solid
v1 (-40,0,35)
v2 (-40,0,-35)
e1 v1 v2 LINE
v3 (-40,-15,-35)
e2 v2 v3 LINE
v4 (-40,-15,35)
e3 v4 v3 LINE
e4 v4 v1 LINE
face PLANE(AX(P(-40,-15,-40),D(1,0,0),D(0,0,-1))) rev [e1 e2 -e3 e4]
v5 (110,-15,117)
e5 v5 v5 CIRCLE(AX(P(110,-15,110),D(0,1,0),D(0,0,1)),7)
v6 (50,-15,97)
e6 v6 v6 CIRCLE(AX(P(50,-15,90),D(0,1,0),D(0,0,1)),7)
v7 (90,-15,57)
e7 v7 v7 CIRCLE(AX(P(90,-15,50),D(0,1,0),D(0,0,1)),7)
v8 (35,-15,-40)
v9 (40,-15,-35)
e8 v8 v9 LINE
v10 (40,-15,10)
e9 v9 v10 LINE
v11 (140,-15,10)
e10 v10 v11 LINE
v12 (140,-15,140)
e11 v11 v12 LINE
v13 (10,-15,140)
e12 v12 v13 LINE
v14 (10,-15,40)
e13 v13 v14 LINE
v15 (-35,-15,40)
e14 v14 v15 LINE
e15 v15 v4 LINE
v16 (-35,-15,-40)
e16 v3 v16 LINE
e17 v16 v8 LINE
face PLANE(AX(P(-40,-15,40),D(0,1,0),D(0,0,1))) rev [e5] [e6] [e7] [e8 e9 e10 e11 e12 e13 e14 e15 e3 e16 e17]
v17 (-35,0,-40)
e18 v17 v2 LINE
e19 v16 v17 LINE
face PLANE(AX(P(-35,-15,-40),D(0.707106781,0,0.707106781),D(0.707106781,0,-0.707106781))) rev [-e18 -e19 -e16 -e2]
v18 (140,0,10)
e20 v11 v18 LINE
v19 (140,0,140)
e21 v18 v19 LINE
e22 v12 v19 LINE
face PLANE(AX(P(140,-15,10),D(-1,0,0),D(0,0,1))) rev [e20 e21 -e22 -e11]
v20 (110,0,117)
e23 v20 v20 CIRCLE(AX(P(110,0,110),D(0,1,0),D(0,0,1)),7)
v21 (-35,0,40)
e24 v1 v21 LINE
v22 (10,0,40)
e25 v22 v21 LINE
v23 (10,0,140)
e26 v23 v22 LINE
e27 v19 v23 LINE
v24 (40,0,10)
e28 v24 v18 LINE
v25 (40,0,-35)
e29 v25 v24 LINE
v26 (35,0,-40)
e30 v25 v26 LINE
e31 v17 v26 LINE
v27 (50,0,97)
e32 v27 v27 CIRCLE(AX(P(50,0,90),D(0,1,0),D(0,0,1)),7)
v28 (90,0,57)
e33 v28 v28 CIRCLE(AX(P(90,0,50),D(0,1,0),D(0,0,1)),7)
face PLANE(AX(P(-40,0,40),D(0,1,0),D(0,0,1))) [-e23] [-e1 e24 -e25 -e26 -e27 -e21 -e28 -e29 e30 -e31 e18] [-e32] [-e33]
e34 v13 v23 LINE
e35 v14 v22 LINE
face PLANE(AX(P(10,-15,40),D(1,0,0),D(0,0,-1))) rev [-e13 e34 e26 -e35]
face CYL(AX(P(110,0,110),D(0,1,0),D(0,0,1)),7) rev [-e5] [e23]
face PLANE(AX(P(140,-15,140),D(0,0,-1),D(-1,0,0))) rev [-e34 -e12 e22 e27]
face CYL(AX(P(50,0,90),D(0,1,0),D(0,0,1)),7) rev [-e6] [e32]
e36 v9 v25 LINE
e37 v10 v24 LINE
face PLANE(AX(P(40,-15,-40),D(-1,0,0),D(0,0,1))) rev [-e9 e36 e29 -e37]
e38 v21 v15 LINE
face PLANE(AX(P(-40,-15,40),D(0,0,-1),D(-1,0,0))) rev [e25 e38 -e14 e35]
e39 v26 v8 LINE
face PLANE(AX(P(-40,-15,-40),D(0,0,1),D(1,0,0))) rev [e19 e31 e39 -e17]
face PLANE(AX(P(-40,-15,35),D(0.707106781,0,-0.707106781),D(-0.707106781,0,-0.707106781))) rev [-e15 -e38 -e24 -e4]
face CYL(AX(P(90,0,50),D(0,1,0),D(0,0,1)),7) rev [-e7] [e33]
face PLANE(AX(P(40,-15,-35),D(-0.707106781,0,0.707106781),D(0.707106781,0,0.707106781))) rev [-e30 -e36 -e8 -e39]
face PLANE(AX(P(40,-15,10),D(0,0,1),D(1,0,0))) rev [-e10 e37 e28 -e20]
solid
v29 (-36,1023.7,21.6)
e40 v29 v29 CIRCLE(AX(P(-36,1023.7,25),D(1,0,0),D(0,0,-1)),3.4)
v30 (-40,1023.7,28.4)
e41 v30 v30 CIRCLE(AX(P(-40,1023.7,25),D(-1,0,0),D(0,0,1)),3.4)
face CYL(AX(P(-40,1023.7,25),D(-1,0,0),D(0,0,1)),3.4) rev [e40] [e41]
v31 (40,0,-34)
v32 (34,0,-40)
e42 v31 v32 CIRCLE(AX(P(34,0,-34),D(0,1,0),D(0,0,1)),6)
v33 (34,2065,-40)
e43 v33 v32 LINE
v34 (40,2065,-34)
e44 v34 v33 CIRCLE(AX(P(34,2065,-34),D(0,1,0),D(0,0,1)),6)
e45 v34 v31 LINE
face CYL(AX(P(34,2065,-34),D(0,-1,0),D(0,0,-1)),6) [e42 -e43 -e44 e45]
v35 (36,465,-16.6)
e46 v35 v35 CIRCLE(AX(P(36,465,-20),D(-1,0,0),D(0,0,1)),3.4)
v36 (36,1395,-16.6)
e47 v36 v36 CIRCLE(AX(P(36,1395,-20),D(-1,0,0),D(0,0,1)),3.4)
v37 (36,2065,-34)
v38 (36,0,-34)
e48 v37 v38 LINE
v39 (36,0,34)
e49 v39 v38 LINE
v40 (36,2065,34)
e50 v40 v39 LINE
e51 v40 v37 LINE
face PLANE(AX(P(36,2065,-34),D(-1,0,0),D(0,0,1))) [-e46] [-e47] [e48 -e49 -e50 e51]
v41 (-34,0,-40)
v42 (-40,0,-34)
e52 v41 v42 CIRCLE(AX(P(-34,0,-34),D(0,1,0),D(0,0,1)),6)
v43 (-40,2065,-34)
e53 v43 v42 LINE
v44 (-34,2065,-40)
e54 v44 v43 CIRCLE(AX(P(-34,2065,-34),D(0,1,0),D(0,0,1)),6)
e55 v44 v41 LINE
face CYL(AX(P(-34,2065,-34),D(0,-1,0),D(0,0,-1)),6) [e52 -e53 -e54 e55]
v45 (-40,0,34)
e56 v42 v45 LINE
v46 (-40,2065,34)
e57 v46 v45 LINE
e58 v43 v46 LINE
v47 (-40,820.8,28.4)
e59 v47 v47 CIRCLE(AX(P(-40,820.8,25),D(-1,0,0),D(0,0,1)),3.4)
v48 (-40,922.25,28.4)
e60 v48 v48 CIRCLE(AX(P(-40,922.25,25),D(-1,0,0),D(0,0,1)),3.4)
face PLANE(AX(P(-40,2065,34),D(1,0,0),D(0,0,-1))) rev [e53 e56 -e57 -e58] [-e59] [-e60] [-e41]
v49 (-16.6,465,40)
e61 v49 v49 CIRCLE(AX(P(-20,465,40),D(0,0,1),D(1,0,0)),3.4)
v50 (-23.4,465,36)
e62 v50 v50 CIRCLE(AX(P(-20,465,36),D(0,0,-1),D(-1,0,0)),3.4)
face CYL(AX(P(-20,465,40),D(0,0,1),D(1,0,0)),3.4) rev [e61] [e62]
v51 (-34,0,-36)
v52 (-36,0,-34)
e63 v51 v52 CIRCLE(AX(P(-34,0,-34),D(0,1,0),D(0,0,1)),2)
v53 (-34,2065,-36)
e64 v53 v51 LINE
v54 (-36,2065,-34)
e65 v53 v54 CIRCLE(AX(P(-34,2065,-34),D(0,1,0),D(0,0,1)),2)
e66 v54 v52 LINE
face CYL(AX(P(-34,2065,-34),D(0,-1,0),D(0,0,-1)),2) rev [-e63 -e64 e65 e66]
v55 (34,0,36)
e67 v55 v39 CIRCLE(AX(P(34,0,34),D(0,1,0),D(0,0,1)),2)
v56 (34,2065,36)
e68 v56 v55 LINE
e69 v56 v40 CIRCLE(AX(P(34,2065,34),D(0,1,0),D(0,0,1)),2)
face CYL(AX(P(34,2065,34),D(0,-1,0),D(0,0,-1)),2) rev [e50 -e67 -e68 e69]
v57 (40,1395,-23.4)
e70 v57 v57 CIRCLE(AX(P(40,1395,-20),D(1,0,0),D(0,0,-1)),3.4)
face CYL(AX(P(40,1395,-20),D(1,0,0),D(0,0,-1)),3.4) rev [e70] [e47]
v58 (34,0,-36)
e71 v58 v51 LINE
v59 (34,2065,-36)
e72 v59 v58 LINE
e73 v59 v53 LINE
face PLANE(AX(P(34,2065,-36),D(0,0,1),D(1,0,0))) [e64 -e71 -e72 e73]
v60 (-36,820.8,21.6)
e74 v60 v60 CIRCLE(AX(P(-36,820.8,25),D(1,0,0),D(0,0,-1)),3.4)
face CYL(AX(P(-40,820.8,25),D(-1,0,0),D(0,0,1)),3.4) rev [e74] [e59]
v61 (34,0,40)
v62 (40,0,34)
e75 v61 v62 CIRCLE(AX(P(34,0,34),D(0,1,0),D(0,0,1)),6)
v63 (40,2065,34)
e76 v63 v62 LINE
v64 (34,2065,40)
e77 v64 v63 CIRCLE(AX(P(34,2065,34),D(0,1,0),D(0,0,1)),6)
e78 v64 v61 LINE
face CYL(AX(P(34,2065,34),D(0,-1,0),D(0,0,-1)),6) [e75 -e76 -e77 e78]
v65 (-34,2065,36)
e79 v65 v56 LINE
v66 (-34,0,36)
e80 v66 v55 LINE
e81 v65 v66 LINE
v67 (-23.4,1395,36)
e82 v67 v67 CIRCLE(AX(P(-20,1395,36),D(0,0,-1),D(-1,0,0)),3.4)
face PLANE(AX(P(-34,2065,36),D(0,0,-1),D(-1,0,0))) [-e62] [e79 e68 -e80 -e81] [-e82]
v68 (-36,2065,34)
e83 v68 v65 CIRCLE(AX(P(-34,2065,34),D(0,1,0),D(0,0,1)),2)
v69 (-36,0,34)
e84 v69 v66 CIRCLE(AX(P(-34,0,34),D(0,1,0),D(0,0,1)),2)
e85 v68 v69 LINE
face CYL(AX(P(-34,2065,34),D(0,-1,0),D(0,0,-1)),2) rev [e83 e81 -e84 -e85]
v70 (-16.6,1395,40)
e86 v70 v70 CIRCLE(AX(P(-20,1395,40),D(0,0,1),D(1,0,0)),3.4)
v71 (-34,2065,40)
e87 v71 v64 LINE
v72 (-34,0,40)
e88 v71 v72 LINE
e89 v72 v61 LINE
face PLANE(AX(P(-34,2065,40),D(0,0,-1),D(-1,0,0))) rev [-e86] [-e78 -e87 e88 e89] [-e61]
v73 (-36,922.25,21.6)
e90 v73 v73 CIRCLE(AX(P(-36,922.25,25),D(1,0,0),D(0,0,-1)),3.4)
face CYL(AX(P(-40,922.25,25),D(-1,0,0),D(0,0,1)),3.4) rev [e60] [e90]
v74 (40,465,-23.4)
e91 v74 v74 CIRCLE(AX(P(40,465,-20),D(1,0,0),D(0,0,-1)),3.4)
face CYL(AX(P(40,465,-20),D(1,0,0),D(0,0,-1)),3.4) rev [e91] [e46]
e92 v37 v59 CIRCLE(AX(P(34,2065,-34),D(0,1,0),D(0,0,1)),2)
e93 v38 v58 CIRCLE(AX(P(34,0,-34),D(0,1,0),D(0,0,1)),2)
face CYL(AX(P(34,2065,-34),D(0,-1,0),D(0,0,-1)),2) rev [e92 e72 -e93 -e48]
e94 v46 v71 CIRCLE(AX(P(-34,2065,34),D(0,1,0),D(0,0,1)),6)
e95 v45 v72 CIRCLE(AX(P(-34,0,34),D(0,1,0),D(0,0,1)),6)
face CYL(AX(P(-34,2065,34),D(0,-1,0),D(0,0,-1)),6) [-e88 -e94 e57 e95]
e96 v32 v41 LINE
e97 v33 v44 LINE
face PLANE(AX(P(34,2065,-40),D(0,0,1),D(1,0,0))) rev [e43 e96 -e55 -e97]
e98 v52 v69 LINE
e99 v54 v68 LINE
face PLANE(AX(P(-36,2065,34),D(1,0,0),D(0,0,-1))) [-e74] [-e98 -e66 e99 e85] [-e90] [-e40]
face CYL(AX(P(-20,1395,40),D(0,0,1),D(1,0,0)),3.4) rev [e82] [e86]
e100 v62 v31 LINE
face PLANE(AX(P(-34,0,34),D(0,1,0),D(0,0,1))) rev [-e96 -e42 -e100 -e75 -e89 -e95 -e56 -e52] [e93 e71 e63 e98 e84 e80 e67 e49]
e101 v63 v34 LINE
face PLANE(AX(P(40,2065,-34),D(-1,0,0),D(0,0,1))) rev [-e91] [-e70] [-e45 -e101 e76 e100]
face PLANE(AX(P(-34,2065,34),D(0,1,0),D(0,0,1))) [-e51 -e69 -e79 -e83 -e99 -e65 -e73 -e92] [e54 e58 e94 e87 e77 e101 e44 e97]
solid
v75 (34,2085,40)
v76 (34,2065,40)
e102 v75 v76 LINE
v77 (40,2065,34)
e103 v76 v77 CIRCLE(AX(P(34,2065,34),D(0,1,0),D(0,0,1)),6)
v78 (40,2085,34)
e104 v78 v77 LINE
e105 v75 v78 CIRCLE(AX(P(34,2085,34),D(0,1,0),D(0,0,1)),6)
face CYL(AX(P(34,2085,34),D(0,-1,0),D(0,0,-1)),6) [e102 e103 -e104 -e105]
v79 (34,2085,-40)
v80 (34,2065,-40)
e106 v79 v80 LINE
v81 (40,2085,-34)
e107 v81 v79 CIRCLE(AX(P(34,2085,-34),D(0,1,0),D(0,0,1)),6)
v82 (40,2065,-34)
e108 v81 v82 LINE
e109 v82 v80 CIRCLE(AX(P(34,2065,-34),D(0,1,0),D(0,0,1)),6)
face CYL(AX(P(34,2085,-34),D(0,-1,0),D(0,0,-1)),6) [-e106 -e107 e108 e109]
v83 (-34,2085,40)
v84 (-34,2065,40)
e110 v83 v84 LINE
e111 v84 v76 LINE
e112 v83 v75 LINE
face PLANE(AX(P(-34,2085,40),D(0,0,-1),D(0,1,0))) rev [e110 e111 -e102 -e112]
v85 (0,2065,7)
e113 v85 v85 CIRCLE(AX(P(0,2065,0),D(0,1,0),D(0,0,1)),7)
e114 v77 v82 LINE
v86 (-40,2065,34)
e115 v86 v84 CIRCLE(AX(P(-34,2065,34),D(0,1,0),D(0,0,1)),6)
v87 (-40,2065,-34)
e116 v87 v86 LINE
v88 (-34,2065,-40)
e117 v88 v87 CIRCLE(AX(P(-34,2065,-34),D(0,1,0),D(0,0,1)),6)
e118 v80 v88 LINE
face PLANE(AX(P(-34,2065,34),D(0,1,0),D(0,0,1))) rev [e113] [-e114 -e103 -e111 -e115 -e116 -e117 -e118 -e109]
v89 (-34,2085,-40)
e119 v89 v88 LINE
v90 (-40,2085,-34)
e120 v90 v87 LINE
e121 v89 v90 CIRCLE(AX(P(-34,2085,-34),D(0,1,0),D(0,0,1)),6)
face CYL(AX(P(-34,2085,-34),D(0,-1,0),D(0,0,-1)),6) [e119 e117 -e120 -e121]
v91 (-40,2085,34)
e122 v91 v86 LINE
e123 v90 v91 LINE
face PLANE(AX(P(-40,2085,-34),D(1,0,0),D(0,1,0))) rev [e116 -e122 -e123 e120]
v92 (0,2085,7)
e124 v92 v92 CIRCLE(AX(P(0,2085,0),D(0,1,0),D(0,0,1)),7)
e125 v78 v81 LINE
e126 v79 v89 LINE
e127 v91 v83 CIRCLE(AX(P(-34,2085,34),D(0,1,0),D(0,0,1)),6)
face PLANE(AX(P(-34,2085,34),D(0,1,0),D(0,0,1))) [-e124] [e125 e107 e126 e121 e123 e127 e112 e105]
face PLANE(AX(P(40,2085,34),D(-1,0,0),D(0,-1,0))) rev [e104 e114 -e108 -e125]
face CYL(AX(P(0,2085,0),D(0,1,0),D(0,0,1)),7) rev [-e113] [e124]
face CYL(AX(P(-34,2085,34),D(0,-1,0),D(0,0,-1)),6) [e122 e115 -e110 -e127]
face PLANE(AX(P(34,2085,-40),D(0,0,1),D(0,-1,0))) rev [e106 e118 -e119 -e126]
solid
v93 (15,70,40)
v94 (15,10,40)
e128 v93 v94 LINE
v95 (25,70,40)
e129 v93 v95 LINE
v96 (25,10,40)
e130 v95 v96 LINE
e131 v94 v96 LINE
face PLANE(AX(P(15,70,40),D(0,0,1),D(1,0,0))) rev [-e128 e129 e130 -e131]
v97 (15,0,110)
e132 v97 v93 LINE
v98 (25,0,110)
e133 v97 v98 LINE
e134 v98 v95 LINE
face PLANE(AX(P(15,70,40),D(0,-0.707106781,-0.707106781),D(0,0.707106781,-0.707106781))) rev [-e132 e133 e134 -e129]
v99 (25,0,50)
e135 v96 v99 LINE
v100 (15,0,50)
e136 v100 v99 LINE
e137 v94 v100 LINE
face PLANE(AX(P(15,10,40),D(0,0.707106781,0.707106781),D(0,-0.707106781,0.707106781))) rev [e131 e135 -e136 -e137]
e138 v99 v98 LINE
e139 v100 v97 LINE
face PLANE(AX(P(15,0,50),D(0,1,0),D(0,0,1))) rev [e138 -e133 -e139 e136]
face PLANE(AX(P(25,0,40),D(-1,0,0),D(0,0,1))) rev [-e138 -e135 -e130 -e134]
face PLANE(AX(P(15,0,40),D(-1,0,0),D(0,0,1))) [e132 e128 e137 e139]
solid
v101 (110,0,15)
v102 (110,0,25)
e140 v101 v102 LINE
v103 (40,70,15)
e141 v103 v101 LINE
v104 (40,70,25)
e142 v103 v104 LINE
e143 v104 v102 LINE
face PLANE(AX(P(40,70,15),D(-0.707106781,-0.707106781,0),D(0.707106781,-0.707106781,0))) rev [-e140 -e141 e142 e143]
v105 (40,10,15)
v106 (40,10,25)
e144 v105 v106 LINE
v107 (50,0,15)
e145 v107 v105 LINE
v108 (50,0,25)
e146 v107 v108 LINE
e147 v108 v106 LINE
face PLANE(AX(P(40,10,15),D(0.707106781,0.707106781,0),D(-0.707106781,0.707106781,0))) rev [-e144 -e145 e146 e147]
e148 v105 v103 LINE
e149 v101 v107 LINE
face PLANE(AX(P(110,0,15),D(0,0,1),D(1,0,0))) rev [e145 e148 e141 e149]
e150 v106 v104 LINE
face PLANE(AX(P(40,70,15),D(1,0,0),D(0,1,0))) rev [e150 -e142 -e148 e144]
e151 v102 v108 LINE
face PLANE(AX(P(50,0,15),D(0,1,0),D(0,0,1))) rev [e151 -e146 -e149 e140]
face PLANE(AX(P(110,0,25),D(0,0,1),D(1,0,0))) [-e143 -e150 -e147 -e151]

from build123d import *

# Parameters (mm, degrees)
MEMBER_1_DEPTH                   = 2065
EXTRUDE_1_DEPTH                  = 15
HOLE_WIZARD_14_0_14_1_AT_2_COUNT = 2
HOLE_WIZARD_14_0_14_1_AT_2_PITCH = 63.245553203
HOLE_WIZARD_14_0_14_1_AT_3_COUNT = 2
HOLE_WIZARD_14_0_14_1_AT_3_PITCH = 63.245553203
EXTRUDE_2_DEPTH                  = 10
EXTRUDE_3_DEPTH                  = 10
CHAMFER_1_SIZE                   = 5
EXTRUDE_6_DEPTH                  = 20
HOLE_START                       = 36
HOLE_WIZARD_M8_1_OUTLINE_R       = 3.4
HOLE_WIZARD_M8_1_DEPTH           = 4
HOLE_WIZARD_M8_2_OUTLINE_R       = 3.4
HOLE_WIZARD_M8_2_DEPTH           = 4
HOLE_WIZARD_M8_3_AT_2_COUNT      = 2
HOLE_WIZARD_M8_3_AT_2_PITCH      = 101.45
HOLE_WIZARD_M8_3_AT_3_COUNT      = 2
HOLE_WIZARD_M8_3_AT_3_PITCH      = 202.9


# Read off the part's stored shape, not the designer's step: M8 螺纹孔1, M8 螺纹孔2
with BuildPart() as part:
    # Sketch11 → Member 1 (new body)
    with BuildSketch(Plane(origin=(0, 0, 0), x_dir=(-1, 0, 0), z_dir=(0, 1, 0))):
        with BuildLine():
            Line((-34, -40), (34, -40))
            ThreePointArc((34, -40), (38.242640687, -38.242640687), (40, -34))
            Line((40, -34), (40, 34))
            ThreePointArc((40, 34), (38.242640687, 38.242640687), (34, 40))
            Line((34, 40), (-34, 40))
            ThreePointArc((-34, 40), (-38.242640687, 38.242640687), (-40, 34))
            Line((-40, 34), (-40, -34))
            ThreePointArc((-40, -34), (-38.242640687, -38.242640687), (-34, -40))
        make_face()
        with BuildLine():
            Line((-34, -36), (34, -36))
            ThreePointArc((34, -36), (35.414213562, -35.414213562), (36, -34))
            Line((36, -34), (36, 34))
            ThreePointArc((36, 34), (35.414213562, 35.414213562), (34, 36))
            Line((34, 36), (-34, 36))
            ThreePointArc((-34, 36), (-35.414213562, 35.414213562), (-36, 34))
            Line((-36, 34), (-36, -34))
            ThreePointArc((-36, -34), (-35.414213562, -35.414213562), (-34, -36))
        make_face(mode=Mode.SUBTRACT)
    extrude(amount=MEMBER_1_DEPTH)

    # M8 螺纹孔1 outline → M8 螺纹孔1 (cut)
    with BuildSketch(Plane.XY.offset(HOLE_START)):
        with Locations((-20, 465)):
            Circle(HOLE_WIZARD_M8_1_OUTLINE_R)
        with Locations((-20, 1395)):
            Circle(HOLE_WIZARD_M8_1_OUTLINE_R)
    extrude(amount=HOLE_WIZARD_M8_1_DEPTH, mode=Mode.SUBTRACT)

    # M8 螺纹孔2 outline → M8 螺纹孔2 (cut)
    with BuildSketch(Plane.YZ.offset(HOLE_START)):
        with Locations((465, -20.000000001)):
            Circle(HOLE_WIZARD_M8_2_OUTLINE_R)
        with Locations((1395, -20.000000001)):
            Circle(HOLE_WIZARD_M8_2_OUTLINE_R)
    extrude(amount=HOLE_WIZARD_M8_2_DEPTH, mode=Mode.SUBTRACT)

    # 草图33 → M8 螺纹孔3 (revolve, cut)
    with BuildSketch(Plane(origin=(-40, 820.8, 25), x_dir=(0, 0, 1), z_dir=(0, 1, 0))):
        Polygon((0, 0), (0, 24.292926105), (3.4, 22.25), (3.4, 0), align=None)
    hole_wizard_m8_3 = revolve(axis=Axis((-46.35, 820.8, 25), (1, 0, 0)), mode=Mode.SUBTRACT)

    # M8 螺纹孔3 at 2: M8 螺纹孔3 ×2
    with Locations(*[(0, i * HOLE_WIZARD_M8_3_AT_2_PITCH, 0) for i in range(1, HOLE_WIZARD_M8_3_AT_2_COUNT)]):
        add(hole_wizard_m8_3, mode=Mode.SUBTRACT)

    # M8 螺纹孔3 at 3: M8 螺纹孔3 ×2
    with Locations(*[(0, i * HOLE_WIZARD_M8_3_AT_3_PITCH, 0) for i in range(1, HOLE_WIZARD_M8_3_AT_3_COUNT)]):
        add(hole_wizard_m8_3, mode=Mode.SUBTRACT)


with BuildPart() as body_2:
    # 草图3 → 凸台-拉伸1 (new body)
    with BuildSketch(Plane.XZ):
        Polygon((10, 40), (10, 140), (140, 140), (140, 10), (40, 10), (40, -40), (-40, -40), (-40, 40), align=None)
    extrude(amount=EXTRUDE_1_DEPTH)

    # 草图4 → Ø14.0 (14) 直径孔1 (revolve, cut)
    with BuildSketch(Plane(origin=(110, 0, 110), x_dir=(0, 0, 1), z_dir=(1, 0, 0))):
        Polygon((0, 0), (0, 44.206024333), (7, 40), (7, 0), align=None)
    hole_wizard_14_0_14_1 = revolve(axis=Axis((110, 6.35, 110), (0, -1, 0)), mode=Mode.SUBTRACT)

    # Ø14.0 (14) 直径孔1 at 2: Ø14.0 (14) 直径孔1 ×2
    with Locations(*[Vector(-0.9486832980505139, 0, -0.316227766016838) * (i * HOLE_WIZARD_14_0_14_1_AT_2_PITCH) for i in range(1, HOLE_WIZARD_14_0_14_1_AT_2_COUNT)]):
        add(hole_wizard_14_0_14_1, mode=Mode.SUBTRACT)

    # Ø14.0 (14) 直径孔1 at 3: Ø14.0 (14) 直径孔1 ×2
    with Locations(*[Vector(-0.3162277660168379, 0, -0.9486832980505139) * (i * HOLE_WIZARD_14_0_14_1_AT_3_PITCH) for i in range(1, HOLE_WIZARD_14_0_14_1_AT_3_COUNT)]):
        add(hole_wizard_14_0_14_1, mode=Mode.SUBTRACT)

    # 倒角1
    chamfer_1_edges = [body_2.edges().sort_by_distance(p)[0] for p in [
        (-40, -7.5, 40),
        (40, -7.5, -40),
        (-40, -7.5, -40),
    ]]
    chamfer(chamfer_1_edges, length=CHAMFER_1_SIZE)


with BuildPart() as body_3:
    # 草图6 → 凸台-拉伸2 (new body)
    with BuildSketch(Plane.ZY.offset(-25)):
        Polygon((40, 70), (110, 0), (50, 0), (40, 10), align=None)
    extrude(amount=EXTRUDE_2_DEPTH)


with BuildPart() as body_4:
    # 草图7 → 凸台-拉伸3 (new body)
    with BuildSketch(Plane(origin=(0, 0, 25), x_dir=(-1, 0, 0), z_dir=(0, 0, -1))):
        Polygon((-40, 70), (-40, 10), (-50, 0), (-110, 0), align=None)
    extrude(amount=EXTRUDE_3_DEPTH)


with BuildPart() as body_5:
    # 草图26 → 凸台-拉伸6 (new body)
    with BuildSketch(Plane(origin=(0, 2065, 0), x_dir=(1, 0, 0), z_dir=(0, 1, 0))):
        with BuildLine():
            Line((-34, -40), (34, -40))
            ThreePointArc((34, -40), (38.242640687, -38.242640687), (40, -34))
            Line((40, -34), (40, 34))
            ThreePointArc((40, 34), (38.242640687, 38.242640687), (34, 40))
            Line((34, 40), (-34, 40))
            ThreePointArc((-34, 40), (-38.242640687, 38.242640687), (-40, 34))
            Line((-40, 34), (-40, -34))
            ThreePointArc((-40, -34), (-38.242640687, -38.242640687), (-34, -40))
        make_face()
    extrude(amount=EXTRUDE_6_DEPTH)

    # 草图27 → M16 螺纹孔1 (revolve, cut)
    with BuildSketch(Plane(origin=(0, 2085, 0), x_dir=(0, 0, 1), z_dir=(1, 0, 0))):
        Polygon((0, 0), (0, 46.206024333), (7, 42), (7, 0), align=None)
    revolve(axis=Axis((0, 2091.35, 0), (0, -1, 0)), mode=Mode.SUBTRACT)


solid = Compound([part.part, body_2.part, body_3.part, body_4.part, body_5.part])
